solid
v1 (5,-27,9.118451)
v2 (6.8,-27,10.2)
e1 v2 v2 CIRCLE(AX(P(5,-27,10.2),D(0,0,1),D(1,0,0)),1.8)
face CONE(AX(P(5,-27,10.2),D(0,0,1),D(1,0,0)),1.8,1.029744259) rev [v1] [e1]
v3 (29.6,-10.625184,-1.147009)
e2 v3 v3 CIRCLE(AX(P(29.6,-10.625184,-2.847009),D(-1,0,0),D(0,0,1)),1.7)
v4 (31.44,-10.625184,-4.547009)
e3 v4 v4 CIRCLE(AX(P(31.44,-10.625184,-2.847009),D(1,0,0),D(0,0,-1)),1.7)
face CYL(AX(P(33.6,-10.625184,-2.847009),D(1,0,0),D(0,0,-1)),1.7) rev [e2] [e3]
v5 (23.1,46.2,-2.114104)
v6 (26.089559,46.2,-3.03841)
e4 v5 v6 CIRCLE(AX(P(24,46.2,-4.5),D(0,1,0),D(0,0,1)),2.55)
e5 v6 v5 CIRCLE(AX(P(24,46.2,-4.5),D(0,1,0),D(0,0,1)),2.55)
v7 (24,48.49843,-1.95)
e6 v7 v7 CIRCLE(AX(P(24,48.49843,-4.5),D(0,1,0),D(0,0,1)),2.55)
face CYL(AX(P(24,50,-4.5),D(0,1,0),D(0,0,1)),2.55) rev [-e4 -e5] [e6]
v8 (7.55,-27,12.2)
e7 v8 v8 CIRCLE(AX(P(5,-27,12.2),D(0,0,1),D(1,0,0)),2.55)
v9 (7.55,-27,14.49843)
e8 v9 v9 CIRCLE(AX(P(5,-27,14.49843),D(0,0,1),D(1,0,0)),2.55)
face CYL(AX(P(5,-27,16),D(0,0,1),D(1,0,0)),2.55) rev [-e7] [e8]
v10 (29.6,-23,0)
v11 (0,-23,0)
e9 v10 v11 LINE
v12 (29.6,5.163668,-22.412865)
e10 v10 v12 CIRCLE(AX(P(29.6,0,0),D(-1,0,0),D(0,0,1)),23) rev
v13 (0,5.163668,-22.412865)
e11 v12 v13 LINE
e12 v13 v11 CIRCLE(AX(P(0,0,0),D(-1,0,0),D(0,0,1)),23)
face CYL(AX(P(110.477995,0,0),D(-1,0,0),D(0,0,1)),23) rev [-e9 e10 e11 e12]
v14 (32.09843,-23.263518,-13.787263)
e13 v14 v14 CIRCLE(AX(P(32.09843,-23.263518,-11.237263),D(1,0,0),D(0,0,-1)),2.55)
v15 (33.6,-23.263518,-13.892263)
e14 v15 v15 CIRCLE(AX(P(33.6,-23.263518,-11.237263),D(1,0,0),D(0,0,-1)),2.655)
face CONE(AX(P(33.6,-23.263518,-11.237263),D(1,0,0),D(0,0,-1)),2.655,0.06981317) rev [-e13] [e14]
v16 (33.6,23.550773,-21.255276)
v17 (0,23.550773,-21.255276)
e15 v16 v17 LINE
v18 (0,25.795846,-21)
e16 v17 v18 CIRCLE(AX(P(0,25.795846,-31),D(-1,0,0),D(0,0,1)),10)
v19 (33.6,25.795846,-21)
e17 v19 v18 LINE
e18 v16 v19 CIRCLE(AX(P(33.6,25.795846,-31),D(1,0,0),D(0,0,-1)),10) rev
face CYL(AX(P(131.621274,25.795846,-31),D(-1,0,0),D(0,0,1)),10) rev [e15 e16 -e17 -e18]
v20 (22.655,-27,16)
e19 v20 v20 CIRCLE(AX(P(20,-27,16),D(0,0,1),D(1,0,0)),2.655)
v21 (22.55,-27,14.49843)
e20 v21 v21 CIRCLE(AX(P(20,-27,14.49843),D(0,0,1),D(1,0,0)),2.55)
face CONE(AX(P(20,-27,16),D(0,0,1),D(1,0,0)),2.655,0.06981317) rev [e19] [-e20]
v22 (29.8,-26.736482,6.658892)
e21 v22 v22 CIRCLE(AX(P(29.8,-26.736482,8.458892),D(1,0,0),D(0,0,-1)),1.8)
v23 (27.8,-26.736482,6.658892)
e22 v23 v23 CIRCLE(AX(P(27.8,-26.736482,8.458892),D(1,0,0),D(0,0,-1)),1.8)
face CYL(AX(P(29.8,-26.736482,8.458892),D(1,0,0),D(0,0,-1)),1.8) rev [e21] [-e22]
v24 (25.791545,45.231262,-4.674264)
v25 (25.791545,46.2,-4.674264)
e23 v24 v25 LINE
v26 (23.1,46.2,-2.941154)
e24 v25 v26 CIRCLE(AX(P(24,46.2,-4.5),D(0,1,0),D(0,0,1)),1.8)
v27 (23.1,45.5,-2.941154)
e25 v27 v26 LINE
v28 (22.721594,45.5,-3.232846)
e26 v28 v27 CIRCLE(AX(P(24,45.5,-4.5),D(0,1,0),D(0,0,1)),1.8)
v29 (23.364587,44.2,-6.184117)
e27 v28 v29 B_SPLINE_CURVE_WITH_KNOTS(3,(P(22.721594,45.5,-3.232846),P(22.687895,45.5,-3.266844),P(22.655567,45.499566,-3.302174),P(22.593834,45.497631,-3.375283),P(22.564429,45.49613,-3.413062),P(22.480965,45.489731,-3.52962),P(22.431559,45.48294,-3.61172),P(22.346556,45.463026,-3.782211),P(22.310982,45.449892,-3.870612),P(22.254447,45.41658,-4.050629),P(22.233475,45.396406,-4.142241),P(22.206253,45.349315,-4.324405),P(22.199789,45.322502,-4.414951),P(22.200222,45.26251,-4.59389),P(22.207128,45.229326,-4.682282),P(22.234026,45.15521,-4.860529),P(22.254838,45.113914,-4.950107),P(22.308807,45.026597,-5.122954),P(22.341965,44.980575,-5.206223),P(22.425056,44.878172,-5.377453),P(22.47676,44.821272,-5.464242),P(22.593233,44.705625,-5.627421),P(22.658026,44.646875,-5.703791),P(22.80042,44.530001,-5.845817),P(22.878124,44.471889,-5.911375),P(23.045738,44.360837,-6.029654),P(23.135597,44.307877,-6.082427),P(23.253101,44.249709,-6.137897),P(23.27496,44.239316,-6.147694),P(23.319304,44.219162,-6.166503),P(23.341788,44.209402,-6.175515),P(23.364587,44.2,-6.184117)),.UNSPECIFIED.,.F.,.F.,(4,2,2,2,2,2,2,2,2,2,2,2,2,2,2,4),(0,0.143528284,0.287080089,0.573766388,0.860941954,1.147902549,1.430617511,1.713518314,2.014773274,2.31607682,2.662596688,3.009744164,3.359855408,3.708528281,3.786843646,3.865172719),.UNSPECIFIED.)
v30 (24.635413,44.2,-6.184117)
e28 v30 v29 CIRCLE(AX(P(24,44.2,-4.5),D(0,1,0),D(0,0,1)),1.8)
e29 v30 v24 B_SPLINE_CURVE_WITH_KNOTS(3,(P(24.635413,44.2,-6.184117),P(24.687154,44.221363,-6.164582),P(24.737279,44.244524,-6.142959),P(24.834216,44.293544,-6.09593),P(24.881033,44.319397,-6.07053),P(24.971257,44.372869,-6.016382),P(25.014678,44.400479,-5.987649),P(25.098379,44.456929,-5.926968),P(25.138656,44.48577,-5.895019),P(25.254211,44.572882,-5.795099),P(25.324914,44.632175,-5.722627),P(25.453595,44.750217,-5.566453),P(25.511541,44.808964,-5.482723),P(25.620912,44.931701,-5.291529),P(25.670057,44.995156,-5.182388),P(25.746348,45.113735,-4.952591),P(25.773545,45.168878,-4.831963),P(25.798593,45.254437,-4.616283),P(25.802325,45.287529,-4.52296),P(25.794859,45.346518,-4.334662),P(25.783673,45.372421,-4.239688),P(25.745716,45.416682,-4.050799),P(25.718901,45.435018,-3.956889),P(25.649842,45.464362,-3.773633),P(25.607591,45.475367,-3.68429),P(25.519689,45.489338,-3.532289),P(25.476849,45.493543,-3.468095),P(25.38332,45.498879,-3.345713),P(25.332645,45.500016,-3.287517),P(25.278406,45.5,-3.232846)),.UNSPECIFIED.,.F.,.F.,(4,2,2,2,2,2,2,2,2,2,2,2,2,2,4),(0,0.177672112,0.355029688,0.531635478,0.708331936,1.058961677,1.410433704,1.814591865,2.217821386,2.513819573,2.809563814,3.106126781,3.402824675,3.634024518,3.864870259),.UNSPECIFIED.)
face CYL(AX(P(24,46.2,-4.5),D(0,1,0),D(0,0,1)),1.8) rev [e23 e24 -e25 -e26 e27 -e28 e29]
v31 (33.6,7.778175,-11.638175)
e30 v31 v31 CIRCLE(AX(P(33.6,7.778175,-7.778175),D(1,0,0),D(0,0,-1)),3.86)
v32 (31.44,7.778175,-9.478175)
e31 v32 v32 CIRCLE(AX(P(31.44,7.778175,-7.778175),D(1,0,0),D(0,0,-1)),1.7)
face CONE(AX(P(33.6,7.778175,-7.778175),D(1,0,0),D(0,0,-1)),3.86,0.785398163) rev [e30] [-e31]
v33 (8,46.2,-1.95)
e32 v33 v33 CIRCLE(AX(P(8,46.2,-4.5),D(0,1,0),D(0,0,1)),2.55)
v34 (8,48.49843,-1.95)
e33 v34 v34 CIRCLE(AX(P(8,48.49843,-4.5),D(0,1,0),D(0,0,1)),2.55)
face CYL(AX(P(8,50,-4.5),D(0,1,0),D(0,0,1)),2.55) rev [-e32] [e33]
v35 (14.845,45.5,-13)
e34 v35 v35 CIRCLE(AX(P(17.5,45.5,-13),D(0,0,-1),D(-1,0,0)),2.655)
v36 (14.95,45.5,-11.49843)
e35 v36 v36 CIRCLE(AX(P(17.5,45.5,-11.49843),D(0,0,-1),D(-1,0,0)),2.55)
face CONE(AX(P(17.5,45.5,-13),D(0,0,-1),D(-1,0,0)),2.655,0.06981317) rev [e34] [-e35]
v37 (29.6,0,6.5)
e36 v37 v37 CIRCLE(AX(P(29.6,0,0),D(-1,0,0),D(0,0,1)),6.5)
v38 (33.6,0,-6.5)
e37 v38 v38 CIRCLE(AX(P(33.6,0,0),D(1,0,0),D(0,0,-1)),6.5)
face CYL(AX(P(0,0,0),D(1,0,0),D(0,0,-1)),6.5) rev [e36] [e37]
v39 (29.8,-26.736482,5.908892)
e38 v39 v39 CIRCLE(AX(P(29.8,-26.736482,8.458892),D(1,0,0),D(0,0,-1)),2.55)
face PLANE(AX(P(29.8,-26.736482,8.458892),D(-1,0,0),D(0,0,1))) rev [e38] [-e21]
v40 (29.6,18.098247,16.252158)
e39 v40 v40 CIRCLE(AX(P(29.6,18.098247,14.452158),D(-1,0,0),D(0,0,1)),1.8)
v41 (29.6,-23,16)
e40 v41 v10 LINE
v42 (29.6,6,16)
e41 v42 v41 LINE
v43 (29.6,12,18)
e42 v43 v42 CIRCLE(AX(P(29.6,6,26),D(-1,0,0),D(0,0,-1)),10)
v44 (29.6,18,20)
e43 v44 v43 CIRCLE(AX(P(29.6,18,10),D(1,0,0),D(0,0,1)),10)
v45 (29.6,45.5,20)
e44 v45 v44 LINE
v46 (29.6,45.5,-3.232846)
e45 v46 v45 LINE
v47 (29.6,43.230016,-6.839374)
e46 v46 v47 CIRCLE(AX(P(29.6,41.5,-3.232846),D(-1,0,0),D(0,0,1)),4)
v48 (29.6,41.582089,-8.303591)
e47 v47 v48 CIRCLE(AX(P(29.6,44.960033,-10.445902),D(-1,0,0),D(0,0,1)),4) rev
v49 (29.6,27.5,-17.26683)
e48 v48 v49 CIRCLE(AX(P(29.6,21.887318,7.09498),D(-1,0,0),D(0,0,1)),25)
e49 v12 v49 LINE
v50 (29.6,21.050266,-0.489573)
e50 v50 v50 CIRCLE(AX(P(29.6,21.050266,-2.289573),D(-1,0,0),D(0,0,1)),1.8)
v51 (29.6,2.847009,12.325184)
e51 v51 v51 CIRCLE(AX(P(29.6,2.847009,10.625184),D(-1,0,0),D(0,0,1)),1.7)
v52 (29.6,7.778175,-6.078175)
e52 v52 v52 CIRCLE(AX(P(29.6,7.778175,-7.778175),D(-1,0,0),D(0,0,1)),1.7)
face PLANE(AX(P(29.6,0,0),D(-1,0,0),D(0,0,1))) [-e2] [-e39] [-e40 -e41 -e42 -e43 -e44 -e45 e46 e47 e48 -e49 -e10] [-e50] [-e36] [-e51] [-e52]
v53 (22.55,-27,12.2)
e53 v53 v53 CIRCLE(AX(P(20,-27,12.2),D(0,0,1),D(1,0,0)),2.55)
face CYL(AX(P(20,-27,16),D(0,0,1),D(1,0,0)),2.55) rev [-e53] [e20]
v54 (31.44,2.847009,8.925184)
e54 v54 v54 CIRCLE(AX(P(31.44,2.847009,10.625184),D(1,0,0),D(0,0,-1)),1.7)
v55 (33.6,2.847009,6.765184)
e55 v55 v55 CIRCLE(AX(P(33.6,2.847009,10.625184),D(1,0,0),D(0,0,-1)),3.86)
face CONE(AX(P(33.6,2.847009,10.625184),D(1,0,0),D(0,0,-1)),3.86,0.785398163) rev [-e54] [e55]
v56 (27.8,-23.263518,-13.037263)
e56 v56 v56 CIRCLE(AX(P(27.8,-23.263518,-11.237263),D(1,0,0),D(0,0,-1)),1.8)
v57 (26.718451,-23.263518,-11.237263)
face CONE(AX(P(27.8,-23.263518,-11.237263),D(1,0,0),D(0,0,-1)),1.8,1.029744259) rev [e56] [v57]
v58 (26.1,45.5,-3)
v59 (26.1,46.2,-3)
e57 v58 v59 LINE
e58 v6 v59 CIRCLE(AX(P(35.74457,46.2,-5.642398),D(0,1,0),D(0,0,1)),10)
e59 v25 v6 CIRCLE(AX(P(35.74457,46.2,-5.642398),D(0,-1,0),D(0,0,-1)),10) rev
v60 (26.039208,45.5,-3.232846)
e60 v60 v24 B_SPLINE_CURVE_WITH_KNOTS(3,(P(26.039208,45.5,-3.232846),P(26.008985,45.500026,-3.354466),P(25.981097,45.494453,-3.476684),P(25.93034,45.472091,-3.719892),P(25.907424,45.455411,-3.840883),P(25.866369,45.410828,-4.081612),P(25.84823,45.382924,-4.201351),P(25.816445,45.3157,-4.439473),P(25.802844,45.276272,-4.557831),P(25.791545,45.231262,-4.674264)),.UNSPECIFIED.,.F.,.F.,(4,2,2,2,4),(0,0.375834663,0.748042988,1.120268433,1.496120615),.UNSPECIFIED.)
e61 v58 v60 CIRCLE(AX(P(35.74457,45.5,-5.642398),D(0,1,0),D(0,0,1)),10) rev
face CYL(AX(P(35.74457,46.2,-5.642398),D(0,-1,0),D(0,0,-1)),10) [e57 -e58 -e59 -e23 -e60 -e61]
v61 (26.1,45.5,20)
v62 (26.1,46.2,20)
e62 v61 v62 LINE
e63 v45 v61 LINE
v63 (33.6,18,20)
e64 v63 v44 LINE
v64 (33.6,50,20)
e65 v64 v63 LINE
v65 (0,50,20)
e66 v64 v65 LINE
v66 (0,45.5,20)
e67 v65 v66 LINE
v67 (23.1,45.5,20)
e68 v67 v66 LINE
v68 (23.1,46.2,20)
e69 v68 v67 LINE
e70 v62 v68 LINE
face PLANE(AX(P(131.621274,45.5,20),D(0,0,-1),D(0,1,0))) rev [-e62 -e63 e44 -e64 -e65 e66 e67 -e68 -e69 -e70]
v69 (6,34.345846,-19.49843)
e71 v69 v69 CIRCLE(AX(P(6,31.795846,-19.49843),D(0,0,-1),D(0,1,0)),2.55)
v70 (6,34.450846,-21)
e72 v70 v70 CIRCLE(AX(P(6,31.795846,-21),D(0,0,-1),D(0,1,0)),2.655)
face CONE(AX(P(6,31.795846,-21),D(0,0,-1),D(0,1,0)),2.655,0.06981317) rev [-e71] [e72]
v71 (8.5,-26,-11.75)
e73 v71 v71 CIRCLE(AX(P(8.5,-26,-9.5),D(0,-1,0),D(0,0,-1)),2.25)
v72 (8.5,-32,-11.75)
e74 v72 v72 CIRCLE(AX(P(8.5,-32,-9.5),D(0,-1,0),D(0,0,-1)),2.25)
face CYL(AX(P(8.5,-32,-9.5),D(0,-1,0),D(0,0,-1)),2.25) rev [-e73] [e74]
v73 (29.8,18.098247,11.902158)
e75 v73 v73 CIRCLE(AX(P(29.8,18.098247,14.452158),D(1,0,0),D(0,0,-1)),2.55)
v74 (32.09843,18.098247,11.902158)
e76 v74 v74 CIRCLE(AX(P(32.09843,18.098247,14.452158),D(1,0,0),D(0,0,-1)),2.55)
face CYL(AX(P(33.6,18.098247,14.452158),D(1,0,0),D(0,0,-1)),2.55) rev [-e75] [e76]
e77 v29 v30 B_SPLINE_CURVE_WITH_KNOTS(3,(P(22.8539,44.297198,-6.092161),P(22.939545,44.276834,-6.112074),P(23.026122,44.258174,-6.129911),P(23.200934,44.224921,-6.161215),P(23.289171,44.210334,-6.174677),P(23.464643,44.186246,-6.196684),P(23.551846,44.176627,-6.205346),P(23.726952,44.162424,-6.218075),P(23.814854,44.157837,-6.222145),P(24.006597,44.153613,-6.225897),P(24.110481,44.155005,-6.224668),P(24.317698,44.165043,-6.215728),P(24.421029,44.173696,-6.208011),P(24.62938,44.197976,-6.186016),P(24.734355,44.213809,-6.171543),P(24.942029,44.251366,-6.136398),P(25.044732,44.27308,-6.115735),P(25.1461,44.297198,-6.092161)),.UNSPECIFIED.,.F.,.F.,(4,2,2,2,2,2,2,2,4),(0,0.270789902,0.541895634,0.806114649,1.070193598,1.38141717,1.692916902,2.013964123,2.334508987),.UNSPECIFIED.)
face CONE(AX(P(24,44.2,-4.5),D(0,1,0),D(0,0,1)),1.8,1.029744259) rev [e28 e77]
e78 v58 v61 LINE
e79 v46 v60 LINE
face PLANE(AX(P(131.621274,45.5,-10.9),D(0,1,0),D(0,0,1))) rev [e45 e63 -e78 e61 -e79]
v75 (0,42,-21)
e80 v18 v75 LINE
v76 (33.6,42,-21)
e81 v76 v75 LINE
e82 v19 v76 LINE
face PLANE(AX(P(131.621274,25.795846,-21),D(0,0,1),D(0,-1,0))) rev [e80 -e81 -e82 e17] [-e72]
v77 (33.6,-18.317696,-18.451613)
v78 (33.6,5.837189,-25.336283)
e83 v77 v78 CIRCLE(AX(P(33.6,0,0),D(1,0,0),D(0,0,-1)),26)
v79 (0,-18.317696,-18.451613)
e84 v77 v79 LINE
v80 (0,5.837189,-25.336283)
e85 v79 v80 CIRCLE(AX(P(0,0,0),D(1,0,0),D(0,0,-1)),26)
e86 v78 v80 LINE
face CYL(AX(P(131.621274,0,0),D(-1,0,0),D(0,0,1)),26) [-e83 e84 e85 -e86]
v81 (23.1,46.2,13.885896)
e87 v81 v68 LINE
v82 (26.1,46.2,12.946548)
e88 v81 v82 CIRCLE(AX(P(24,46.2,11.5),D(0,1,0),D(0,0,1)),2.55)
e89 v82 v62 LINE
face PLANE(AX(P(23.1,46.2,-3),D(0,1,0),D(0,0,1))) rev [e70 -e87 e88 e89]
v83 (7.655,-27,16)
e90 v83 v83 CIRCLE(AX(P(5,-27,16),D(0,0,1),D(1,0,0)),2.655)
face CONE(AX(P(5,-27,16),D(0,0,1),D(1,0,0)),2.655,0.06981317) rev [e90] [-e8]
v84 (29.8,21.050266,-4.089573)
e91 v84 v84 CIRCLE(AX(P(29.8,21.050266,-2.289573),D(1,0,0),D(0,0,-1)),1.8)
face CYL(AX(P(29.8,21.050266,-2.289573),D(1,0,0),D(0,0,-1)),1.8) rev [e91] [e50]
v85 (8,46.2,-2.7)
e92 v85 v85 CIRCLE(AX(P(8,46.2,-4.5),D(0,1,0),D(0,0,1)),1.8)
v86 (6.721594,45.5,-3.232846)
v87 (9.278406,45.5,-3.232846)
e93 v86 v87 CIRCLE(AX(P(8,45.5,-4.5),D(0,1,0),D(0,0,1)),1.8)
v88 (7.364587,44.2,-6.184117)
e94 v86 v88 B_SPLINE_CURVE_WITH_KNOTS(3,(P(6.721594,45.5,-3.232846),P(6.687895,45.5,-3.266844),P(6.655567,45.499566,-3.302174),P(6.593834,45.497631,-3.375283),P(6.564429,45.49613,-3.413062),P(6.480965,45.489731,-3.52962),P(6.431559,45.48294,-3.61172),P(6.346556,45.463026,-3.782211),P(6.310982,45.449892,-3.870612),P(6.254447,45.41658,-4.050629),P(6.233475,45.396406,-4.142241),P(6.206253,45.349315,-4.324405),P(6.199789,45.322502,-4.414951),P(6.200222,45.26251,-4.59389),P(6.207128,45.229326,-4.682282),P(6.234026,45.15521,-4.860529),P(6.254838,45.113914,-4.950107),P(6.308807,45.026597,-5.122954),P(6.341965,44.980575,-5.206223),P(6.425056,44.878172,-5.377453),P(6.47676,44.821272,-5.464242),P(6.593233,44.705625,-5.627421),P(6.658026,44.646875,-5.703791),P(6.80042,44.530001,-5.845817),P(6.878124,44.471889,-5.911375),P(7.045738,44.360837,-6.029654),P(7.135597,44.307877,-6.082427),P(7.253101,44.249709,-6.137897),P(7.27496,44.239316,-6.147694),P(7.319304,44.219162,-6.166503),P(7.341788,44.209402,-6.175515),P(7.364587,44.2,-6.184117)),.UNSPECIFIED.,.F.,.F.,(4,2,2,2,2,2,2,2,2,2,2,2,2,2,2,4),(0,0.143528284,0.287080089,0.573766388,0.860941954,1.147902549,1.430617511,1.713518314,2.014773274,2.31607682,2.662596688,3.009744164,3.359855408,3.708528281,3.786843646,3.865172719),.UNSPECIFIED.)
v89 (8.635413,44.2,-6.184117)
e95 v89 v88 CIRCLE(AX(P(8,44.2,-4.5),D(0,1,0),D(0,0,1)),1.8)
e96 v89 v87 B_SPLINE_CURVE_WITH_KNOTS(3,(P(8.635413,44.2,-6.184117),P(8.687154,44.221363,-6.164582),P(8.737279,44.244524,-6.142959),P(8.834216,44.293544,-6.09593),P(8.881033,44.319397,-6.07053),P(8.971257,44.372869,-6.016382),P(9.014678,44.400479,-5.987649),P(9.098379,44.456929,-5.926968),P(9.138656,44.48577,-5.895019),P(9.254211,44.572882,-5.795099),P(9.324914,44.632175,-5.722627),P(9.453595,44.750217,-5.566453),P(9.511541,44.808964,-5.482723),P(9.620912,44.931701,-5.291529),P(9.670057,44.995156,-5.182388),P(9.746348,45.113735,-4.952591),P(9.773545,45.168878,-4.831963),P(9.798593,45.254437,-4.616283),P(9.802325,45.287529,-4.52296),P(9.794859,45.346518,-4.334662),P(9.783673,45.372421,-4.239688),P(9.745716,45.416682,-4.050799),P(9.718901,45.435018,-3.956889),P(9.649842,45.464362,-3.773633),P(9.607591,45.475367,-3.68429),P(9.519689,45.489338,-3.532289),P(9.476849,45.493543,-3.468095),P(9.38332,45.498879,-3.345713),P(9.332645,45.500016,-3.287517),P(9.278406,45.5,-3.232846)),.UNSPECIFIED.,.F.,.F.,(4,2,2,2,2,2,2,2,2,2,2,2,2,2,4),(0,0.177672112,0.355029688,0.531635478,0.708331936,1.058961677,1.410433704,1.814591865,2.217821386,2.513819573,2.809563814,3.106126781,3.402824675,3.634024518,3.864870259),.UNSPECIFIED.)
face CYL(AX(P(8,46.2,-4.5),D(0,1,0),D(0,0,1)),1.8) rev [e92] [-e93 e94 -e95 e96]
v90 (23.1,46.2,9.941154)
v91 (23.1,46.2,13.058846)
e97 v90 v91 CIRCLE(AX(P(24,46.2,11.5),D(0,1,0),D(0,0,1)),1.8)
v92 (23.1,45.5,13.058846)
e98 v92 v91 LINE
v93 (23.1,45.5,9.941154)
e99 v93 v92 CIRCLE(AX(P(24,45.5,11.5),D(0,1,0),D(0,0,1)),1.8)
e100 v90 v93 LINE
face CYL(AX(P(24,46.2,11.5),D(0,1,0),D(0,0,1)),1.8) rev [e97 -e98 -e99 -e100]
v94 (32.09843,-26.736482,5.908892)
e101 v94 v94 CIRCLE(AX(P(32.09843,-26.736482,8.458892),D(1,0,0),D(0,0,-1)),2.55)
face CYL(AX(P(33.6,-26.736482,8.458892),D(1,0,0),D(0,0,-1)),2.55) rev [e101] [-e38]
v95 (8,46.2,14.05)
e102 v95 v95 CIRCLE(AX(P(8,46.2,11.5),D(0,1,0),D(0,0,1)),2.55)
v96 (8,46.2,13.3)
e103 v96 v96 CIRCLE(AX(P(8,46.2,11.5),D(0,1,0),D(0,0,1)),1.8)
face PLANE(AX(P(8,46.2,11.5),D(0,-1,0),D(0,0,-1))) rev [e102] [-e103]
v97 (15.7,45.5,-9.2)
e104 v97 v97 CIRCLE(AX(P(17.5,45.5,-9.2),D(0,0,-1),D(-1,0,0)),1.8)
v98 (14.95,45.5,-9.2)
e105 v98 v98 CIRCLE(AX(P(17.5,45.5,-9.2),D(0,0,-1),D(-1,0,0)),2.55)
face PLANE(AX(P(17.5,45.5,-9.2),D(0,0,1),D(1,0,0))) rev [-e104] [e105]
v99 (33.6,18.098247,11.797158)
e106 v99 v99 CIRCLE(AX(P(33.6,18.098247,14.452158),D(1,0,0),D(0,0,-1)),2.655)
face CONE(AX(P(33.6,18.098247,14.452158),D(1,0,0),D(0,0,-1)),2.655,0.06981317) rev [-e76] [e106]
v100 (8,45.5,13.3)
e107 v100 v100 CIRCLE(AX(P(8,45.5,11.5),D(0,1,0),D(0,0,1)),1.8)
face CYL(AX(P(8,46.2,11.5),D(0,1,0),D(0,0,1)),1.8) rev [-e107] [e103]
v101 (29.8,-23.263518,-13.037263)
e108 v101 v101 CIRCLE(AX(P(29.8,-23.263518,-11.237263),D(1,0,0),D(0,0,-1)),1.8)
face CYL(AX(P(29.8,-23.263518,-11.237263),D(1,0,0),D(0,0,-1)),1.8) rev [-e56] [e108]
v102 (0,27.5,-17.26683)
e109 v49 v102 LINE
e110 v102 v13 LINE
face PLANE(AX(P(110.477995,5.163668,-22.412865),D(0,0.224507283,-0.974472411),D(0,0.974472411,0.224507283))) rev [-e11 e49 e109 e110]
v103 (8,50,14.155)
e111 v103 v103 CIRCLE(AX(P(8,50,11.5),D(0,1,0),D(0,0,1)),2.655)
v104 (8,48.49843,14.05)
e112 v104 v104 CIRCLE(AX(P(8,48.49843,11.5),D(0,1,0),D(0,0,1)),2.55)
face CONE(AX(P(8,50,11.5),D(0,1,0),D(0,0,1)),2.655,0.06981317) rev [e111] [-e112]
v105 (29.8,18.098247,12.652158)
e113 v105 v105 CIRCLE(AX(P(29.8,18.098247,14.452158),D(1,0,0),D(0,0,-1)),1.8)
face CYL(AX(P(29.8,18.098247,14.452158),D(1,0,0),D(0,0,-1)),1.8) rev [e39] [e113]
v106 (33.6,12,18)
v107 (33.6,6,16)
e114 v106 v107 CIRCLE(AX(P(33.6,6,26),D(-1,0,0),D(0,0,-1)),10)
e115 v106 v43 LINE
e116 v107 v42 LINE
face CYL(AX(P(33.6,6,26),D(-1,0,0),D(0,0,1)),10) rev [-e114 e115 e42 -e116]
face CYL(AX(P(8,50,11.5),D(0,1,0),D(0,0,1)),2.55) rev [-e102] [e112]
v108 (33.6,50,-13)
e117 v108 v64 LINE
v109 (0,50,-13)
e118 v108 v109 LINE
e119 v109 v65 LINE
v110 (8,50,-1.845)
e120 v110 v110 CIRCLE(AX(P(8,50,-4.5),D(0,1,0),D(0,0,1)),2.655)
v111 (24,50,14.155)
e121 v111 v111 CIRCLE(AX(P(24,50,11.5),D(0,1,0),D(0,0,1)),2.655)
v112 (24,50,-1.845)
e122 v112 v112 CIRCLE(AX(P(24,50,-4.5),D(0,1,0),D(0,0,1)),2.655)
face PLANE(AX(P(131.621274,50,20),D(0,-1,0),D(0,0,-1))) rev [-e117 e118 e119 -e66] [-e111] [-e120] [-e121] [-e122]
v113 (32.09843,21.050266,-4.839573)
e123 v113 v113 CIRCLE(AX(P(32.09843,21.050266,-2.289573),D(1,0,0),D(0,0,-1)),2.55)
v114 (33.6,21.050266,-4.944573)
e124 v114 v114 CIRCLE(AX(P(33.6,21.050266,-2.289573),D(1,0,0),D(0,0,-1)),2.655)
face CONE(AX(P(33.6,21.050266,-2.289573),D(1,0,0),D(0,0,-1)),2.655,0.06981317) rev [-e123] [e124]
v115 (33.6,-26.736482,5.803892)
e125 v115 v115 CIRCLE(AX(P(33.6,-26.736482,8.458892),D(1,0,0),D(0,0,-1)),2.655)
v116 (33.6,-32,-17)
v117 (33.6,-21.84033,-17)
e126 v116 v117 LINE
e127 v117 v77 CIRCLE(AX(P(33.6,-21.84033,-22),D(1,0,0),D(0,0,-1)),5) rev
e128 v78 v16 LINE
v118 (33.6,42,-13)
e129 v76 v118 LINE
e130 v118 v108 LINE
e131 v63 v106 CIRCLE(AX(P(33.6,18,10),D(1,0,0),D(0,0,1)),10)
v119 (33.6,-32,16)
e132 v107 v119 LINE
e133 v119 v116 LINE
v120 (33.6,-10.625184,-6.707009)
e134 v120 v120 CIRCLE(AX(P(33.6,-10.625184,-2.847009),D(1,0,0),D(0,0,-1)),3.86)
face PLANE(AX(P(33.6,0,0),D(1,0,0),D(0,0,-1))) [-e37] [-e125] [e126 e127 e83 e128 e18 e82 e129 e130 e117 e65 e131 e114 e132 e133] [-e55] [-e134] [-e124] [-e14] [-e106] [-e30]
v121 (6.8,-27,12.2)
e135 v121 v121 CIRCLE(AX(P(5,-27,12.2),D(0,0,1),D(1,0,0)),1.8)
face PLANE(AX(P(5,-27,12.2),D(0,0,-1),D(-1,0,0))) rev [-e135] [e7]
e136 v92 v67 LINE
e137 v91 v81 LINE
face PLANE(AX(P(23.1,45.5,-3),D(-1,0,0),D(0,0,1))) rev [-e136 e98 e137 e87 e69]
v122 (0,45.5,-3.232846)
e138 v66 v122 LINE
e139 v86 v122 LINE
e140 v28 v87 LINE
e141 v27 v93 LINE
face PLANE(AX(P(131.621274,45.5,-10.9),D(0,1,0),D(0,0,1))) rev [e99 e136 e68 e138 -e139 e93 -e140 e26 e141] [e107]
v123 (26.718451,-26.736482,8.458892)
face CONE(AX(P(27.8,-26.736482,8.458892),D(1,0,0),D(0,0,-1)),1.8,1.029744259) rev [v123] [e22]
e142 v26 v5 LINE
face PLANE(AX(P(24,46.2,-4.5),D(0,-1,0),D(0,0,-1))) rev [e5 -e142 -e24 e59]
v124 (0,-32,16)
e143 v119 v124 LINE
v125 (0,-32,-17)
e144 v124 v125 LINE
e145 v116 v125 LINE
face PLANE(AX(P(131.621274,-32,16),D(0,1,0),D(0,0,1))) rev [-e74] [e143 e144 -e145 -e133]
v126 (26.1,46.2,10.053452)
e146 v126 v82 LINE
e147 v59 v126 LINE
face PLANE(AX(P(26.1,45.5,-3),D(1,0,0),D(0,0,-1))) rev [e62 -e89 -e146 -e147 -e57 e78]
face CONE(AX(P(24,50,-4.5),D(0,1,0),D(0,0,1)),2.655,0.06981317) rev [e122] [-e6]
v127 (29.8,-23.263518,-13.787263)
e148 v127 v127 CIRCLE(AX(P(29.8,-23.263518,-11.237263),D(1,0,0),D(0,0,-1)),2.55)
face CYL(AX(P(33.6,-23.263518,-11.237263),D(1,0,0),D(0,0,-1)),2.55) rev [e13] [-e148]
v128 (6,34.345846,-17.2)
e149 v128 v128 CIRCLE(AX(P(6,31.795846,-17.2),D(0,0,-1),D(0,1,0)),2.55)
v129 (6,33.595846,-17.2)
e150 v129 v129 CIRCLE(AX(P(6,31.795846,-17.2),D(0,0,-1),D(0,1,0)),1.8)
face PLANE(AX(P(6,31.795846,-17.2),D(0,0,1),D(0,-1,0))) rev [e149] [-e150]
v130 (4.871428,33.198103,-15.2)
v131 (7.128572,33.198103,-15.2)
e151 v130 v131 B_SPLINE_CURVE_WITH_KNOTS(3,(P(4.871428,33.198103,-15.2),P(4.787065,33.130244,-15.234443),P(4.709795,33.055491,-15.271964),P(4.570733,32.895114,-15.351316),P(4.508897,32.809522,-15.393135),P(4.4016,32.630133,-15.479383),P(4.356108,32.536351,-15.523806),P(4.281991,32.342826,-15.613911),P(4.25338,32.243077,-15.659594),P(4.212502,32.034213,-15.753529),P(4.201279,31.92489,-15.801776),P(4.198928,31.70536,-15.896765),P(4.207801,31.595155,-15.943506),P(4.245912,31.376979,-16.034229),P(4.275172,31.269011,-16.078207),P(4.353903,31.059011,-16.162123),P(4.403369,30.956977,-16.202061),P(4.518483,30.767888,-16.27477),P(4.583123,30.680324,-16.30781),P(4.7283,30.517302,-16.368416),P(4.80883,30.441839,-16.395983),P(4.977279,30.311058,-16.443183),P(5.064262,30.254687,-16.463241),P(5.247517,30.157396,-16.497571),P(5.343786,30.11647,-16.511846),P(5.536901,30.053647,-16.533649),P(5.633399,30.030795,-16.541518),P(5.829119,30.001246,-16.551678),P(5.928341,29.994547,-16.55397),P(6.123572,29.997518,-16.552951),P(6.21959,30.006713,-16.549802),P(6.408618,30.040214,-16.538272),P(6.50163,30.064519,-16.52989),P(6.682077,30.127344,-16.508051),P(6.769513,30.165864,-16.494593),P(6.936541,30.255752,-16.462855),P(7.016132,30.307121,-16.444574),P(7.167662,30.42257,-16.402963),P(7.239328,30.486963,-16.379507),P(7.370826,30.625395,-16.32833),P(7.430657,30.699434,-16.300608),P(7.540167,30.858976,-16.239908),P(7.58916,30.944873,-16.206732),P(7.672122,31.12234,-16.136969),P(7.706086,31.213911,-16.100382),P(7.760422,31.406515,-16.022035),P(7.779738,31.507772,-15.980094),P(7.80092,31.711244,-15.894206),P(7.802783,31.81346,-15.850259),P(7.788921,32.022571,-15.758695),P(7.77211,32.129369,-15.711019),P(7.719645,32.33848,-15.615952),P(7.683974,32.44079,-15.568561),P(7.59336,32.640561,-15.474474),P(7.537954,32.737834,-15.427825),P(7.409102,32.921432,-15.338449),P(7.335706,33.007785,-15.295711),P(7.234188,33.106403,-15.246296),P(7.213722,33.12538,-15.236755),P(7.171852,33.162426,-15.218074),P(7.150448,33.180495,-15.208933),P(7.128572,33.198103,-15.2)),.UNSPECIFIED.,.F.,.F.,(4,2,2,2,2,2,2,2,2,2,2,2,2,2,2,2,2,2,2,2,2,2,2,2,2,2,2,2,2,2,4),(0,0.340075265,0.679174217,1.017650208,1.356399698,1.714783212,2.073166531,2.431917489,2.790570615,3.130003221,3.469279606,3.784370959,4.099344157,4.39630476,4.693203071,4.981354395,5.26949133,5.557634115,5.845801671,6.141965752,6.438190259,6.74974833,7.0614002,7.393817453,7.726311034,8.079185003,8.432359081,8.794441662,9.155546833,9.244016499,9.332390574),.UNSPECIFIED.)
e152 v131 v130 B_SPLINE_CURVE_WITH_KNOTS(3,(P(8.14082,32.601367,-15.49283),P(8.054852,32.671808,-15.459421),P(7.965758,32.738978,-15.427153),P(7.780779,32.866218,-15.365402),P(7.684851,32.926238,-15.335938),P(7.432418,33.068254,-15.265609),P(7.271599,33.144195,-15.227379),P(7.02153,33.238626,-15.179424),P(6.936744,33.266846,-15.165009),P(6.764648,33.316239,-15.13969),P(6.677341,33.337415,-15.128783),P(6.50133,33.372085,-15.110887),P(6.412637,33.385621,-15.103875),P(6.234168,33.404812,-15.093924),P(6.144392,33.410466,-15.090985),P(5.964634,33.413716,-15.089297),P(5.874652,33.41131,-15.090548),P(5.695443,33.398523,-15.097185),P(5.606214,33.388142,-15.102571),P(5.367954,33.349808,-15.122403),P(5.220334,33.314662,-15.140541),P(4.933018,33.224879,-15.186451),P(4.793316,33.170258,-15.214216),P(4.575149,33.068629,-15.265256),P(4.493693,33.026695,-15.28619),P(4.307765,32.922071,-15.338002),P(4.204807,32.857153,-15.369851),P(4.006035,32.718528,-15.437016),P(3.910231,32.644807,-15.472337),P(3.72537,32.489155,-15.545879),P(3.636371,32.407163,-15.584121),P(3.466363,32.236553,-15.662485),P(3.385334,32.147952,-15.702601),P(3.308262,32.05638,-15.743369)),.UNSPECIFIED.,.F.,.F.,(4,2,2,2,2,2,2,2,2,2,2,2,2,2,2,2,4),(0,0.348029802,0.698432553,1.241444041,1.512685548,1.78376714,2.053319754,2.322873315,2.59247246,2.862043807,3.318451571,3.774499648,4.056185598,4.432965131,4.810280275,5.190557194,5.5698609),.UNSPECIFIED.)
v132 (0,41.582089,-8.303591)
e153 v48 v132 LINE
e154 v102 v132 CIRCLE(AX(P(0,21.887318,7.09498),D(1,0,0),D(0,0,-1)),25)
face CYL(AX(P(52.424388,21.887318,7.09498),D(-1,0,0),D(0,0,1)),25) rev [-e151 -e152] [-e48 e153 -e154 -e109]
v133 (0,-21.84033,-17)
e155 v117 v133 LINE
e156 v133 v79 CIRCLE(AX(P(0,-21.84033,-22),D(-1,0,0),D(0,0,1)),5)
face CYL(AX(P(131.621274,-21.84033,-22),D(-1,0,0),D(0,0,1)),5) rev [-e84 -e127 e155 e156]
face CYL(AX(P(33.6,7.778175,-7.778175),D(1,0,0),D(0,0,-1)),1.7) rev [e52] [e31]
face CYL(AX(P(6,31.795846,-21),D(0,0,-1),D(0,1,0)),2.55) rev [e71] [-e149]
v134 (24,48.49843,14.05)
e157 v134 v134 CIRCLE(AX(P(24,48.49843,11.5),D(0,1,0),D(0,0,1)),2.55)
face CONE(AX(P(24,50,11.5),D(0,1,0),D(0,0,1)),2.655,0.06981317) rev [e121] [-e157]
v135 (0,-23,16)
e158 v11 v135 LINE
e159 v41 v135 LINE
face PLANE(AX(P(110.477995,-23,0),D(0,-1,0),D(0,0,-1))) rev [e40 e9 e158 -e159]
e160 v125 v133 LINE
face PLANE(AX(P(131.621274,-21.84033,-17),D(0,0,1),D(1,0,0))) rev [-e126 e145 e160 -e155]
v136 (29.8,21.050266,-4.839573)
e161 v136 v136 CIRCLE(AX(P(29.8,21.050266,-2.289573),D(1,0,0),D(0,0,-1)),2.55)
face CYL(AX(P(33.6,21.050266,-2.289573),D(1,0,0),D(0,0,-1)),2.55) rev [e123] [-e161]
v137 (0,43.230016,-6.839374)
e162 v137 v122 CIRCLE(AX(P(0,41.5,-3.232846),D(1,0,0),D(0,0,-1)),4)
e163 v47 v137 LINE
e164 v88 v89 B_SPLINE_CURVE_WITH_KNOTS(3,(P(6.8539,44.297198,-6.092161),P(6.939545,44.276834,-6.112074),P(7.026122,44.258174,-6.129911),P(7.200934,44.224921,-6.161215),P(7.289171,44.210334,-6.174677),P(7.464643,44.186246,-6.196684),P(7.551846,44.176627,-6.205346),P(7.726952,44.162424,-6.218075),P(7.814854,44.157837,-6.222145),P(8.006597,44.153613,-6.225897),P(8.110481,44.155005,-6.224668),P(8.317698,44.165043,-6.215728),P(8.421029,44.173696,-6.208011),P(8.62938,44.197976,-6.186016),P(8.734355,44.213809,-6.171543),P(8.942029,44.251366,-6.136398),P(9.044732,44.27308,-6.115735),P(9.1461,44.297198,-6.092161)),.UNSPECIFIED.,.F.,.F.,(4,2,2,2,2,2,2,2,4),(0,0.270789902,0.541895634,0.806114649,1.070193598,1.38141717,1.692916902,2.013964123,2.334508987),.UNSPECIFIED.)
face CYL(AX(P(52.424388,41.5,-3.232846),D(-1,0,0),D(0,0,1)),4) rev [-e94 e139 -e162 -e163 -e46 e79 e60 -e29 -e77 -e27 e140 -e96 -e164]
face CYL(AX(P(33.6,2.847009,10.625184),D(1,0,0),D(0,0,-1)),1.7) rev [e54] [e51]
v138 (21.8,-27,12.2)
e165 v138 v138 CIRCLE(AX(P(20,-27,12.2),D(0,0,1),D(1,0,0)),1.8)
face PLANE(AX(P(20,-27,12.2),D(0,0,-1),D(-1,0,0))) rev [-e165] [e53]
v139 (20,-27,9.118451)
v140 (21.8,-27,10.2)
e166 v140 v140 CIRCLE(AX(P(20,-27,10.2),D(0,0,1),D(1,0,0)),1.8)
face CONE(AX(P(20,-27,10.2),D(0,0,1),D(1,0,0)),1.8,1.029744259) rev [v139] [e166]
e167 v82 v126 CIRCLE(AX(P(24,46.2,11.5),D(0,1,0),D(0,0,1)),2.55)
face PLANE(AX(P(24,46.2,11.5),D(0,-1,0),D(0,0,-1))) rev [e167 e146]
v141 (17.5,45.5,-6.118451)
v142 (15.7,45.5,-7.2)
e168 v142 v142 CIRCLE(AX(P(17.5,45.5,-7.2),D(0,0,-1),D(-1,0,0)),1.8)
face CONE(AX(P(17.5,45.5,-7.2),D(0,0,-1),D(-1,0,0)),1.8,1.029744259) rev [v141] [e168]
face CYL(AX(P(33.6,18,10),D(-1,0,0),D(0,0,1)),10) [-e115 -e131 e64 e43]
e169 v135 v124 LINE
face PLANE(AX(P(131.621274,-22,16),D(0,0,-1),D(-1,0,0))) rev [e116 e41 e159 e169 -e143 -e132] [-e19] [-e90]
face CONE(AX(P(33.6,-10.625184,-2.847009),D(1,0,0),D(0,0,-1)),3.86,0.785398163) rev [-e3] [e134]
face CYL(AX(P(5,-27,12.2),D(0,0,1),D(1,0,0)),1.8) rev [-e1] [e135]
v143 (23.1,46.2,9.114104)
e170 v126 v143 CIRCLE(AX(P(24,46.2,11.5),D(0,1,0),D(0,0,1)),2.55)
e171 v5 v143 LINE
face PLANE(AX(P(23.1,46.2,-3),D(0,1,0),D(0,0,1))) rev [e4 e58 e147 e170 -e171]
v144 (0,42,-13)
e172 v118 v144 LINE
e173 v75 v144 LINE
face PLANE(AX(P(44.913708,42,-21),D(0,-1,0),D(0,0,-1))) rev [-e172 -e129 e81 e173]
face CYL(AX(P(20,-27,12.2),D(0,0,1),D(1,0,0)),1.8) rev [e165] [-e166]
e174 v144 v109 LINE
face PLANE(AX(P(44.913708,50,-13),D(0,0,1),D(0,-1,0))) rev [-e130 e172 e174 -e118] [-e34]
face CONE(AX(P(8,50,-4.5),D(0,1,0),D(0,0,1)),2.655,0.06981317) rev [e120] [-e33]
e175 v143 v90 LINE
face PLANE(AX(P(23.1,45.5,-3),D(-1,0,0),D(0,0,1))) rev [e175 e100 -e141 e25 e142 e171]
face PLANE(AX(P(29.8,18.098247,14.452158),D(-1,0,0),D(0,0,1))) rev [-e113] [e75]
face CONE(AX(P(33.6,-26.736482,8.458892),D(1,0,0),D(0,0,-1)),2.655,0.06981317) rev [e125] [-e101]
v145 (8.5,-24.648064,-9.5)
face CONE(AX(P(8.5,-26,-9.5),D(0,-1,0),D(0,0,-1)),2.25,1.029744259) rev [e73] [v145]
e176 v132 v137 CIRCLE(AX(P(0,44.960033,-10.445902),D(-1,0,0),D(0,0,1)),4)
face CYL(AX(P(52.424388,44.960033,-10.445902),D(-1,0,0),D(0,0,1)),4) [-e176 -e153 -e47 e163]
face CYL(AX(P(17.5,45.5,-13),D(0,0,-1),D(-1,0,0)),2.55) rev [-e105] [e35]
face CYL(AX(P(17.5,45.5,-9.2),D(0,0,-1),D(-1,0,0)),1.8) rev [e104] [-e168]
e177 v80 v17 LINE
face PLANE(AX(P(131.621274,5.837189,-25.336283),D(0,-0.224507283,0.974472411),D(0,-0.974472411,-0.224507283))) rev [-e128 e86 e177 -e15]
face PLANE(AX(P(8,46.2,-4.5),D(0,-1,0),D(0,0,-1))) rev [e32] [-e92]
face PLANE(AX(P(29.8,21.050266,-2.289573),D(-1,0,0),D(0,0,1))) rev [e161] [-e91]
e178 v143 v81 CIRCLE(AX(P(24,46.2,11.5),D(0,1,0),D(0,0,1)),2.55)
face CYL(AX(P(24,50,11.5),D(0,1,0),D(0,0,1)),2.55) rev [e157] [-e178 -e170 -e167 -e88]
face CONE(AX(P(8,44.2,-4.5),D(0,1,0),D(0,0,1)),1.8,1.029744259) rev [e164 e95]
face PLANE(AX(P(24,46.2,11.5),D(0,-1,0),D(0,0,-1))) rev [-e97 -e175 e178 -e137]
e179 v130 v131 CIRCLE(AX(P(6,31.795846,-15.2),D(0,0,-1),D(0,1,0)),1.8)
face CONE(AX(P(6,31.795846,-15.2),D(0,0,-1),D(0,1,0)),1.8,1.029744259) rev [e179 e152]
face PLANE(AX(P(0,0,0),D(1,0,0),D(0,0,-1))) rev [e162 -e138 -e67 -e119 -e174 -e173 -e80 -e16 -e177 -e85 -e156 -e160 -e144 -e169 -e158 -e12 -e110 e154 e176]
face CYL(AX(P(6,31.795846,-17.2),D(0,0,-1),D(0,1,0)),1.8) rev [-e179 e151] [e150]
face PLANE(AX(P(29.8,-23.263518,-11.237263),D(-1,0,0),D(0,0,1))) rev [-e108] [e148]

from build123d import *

# Parameters (mm, degrees)
MOTOR_SHELL_DEPTH                   = 33.6
MOTOR_MOUNT_DEPTH                   = 4
MOUNTING_HOLE_D                     = 3.4
MOUNTING_HOLE_CSINK_D               = 7.72
MOUNTING_HOLE_CSINK_ANGLE           = 90
HOLE_DUPLICATION_COUNT              = 3
SKETCH11_R                          = 6.5
SHAFT_BASE_CUTOUT_DEPTH             = 66.612193989
CSK_FOR_M3_INSERT_SFHCS1_AT_2_COUNT = 2
CSK_FOR_M3_INSERT_SFHCS1_AT_2_PITCH = 20
CSK_FOR_M3_INSERT_SFHCS1_AT_3_COUNT = 2
CSK_FOR_M3_INSERT_SFHCS1_AT_3_PITCH = 45.233529346
CSK_FOR_M3_INSERT_SFHCS1_AT_4_COUNT = 2
CSK_FOR_M3_INSERT_SFHCS1_AT_4_PITCH = 48.980637063
CSK_FOR_M3_INSERT_SFHCS2_AT_2_COUNT = 2
CSK_FOR_M3_INSERT_SFHCS2_AT_2_PITCH = 16
CSK_FOR_M3_INSERT_SFHCS2_AT_3_COUNT = 2
CSK_FOR_M3_INSERT_SFHCS2_AT_3_PITCH = 22.627416998
CSK_FOR_M3_INSERT_SFHCS2_AT_4_COUNT = 2
CSK_FOR_M3_INSERT_SFHCS2_AT_4_PITCH = 16
CSK_FOR_M3_INSERT_SFHCS3_AT_2_COUNT = 2
CSK_FOR_M3_INSERT_SFHCS3_AT_2_PITCH = 15
ENLARGE_CAVITY_DEPTH                = 29.6
MOD_1_DEPTH                         = 29.6
SKETCH31_W                          = 8
SKETCH31_H                          = 8
MOD_2_DEPTH                         = 33.6
SKETCH36_W                          = 3
SKETCH36_H                          = 0.7
CUT_EXTRUDE1_DEPTH                  = 23
M4_CLEARANCE_HOLE1_D                = 4.5
M4_CLEARANCE_HOLE1_DEPTH            = 6
M4_CLEARANCE_HOLE1_TIP              = 1.351936393
INSERT_START                        = 45.5
INSERT_CLEARANCES_OUTLINE_R         = 1.8
INSERT_CLEARANCES_DEPTH             = 0.7
INSERT_START_2                      = 29.6
INSERT_CLEARANCES_2_OUTLINE_R       = 1.8
INSERT_CLEARANCES_2_DEPTH           = 0.2
INSERT_CLEARANCES_5_OUTLINE_W       = 1.724765775
INSERT_CLEARANCES_5_OUTLINE_H       = 2.045205283
INSERT_CLEARANCES_8_OUTLINE_W       = 1.724765775
INSERT_CLEARANCES_8_OUTLINE_H       = 2.045205283
FILLET1_R                           = 10


# Read off the part's stored shape, not the designer's step: Insert clearances
with BuildPart() as part:
    # Motor Shell Profile → Motor Shell (new body)
    with BuildSketch(Plane(origin=(0, 0, 0), x_dir=(0, 0, -1), z_dir=(1, 0, 0))):
        with BuildLine():
            Line((25.336282685, 5.837189366), (21.25527589, 23.550772962))
            ThreePointArc((21.25527589, 23.550772962), (21.064023926, 24.66607615), (21, 25.795845795))
            Line((21, 25.795845795), (21, 50))
            Line((21, 50), (-20, 50))
            Line((-20, 50), (-20, 45.5))
            Line((-20, 45.5), (10.9, 45.5))
            ThreePointArc((10.9, 45.5), (12.314213562, 44.914213562), (12.9, 43.5))
            Line((12.9, 43.5), (12.9, 42))
            Line((12.9, 42), (21.438393041, 4.939160233))
            ThreePointArc((21.438393041, 4.939160233), (17.214260442, -13.699242221), (0, -22))
            Line((0, -22), (-16, -22))
            Line((-16, -22), (-16, -32))
            Line((-16, -32), (17, -32))
            Line((17, -32), (17, -21.840329668))
            ThreePointArc((17, -21.840329668), (17.377125597, -19.935327763), (18.451612903, -18.31769585))
            ThreePointArc((18.451612903, -18.31769585), (25.004191048, -7.126740491), (25.336282685, 5.837189366))
        make_face()
    extrude(amount=MOTOR_SHELL_DEPTH)

    # Sketch3 → Motor Mount (add)
    with BuildSketch(Plane(origin=(29.6, 0, 0), x_dir=(0, 0, -1), z_dir=(1, 0, 0))):
        with BuildLine():
            Line((-20, 45.5), (12.9, 45.5))
            Line((12.9, 45.5), (12.9, 42))
            Line((12.9, 42), (21.438393041, 4.939160233))
            ThreePointArc((21.438393041, 4.939160233), (17.214260442, -13.699242221), (0, -22))
            Line((0, -22), (-16, -22))
            Line((-16, -22), (-16, 6))
            ThreePointArc((-16, 6), (-16.513167019, 9.16227766), (-18, 12))
            ThreePointArc((-18, 12), (-19.486832981, 14.83772234), (-20, 18))
            Line((-20, 18), (-20, 45.5))
        make_face()
    extrude(amount=MOTOR_MOUNT_DEPTH)

    # Mounting Hole (through all)
    with Locations(Plane(origin=(33.6, 0, 0), x_dir=(0, 0, -1), z_dir=(1, 0, 0))):
        with Locations((2.847009496, -10.625184089)):
            mounting_hole = CounterSinkHole(MOUNTING_HOLE_D / 2, MOUNTING_HOLE_CSINK_D / 2, counter_sink_angle=MOUNTING_HOLE_CSINK_ANGLE)

    # Hole Duplication: Mounting Hole ×3 about axis
    hole_duplication_axis = Axis((0, 0, 0), (1, 0, 0))
    for i in range(1, HOLE_DUPLICATION_COUNT):
        add(mounting_hole.rotate(hole_duplication_axis, i * 360 / HOLE_DUPLICATION_COUNT), mode=Mode.SUBTRACT)

    # Sketch11 → Shaft Base Cutout (cut, through all)
    with BuildSketch(Plane(origin=(33.6, 0, 0), x_dir=(0, 0, -1), z_dir=(1, 0, 0))):
        Circle(SKETCH11_R)
    extrude(amount=-SHAFT_BASE_CUTOUT_DEPTH, mode=Mode.SUBTRACT)

    # Sketch15 → CSK for M3 Insert SFHCS1 (revolve, cut)
    with BuildSketch(Plane(origin=(33.6, -26.736481777, 8.458892109), x_dir=(0, 0, -1), z_dir=(0, 1, 0))):
        Polygon((0, 0), (0, 3.8), (2.55, 3.8), (2.55, 1.501569957), (2.655, 0), align=None)
    csk_for_m3_insert_sfhcs1 = revolve(axis=Axis((39.95, -26.736481777, 8.458892109), (-1, 0, 0)), mode=Mode.SUBTRACT)

    # CSK for M3 Insert SFHCS1 at 2: CSK for M3 Insert SFHCS1 ×2
    with Locations(*[Vector(0, 0.17364817766693078, -0.984807753012208) * (i * CSK_FOR_M3_INSERT_SFHCS1_AT_2_PITCH) for i in range(1, CSK_FOR_M3_INSERT_SFHCS1_AT_2_COUNT)]):
        add(csk_for_m3_insert_sfhcs1, mode=Mode.SUBTRACT)

    # CSK for M3 Insert SFHCS1 at 3: CSK for M3 Insert SFHCS1 ×2
    with Locations(*[Vector(0, 0.9911835262254977, 0.13249610310944374) * (i * CSK_FOR_M3_INSERT_SFHCS1_AT_3_PITCH) for i in range(1, CSK_FOR_M3_INSERT_SFHCS1_AT_3_COUNT)]):
        add(csk_for_m3_insert_sfhcs1, mode=Mode.SUBTRACT)

    # CSK for M3 Insert SFHCS1 at 4: CSK for M3 Insert SFHCS1 ×2
    with Locations(*[Vector(0, 0.975625288008145, -0.219443153001009) * (i * CSK_FOR_M3_INSERT_SFHCS1_AT_4_PITCH) for i in range(1, CSK_FOR_M3_INSERT_SFHCS1_AT_4_COUNT)]):
        add(csk_for_m3_insert_sfhcs1, mode=Mode.SUBTRACT)

    # Sketch18 → CSK for M3 Insert SFHCS2 (revolve, cut)
    with BuildSketch(Plane(origin=(8, 50, -4.5), x_dir=(0, 0, 1), z_dir=(1, 0, 0))):
        Polygon((0, 0), (0, 3.8), (2.55, 3.8), (2.55, 1.501569957), (2.655, 0), align=None)
    csk_for_m3_insert_sfhcs2 = revolve(axis=Axis((8, 56.35, -4.5), (0, -1, 0)), mode=Mode.SUBTRACT)

    # CSK for M3 Insert SFHCS2 at 2: CSK for M3 Insert SFHCS2 ×2
    with Locations(*[(0, 0, i * CSK_FOR_M3_INSERT_SFHCS2_AT_2_PITCH) for i in range(1, CSK_FOR_M3_INSERT_SFHCS2_AT_2_COUNT)]):
        add(csk_for_m3_insert_sfhcs2, mode=Mode.SUBTRACT)

    # CSK for M3 Insert SFHCS2 at 3: CSK for M3 Insert SFHCS2 ×2
    with Locations(*[Vector(0.7071067811865475, 0, 0.7071067811865476) * (i * CSK_FOR_M3_INSERT_SFHCS2_AT_3_PITCH) for i in range(1, CSK_FOR_M3_INSERT_SFHCS2_AT_3_COUNT)]):
        add(csk_for_m3_insert_sfhcs2, mode=Mode.SUBTRACT)

    # CSK for M3 Insert SFHCS2 at 4: CSK for M3 Insert SFHCS2 ×2
    with Locations(*[(i * CSK_FOR_M3_INSERT_SFHCS2_AT_4_PITCH, 0, 0) for i in range(1, CSK_FOR_M3_INSERT_SFHCS2_AT_4_COUNT)]):
        add(csk_for_m3_insert_sfhcs2, mode=Mode.SUBTRACT)

    # Sketch24 → CSK for M3 Insert SFHCS3 (revolve, cut)
    with BuildSketch(Plane(origin=(5, -27, 16), x_dir=(0, -1, 0), z_dir=(1, 0, 0))):
        Polygon((0, 0), (0, 3.8), (2.55, 3.8), (2.55, 1.501569957), (2.655, 0), align=None)
    csk_for_m3_insert_sfhcs3 = revolve(axis=Axis((5, -27, 22.35), (0, 0, -1)), mode=Mode.SUBTRACT)

    # CSK for M3 Insert SFHCS3 at 2: CSK for M3 Insert SFHCS3 ×2
    with Locations(*[(i * CSK_FOR_M3_INSERT_SFHCS3_AT_2_PITCH, 0, 0) for i in range(1, CSK_FOR_M3_INSERT_SFHCS3_AT_2_COUNT)]):
        add(csk_for_m3_insert_sfhcs3, mode=Mode.SUBTRACT)

    # Sketch29 → Enlarge Cavity (cut)
    with BuildSketch(Plane.ZY):
        with BuildLine():
            Line((0, -23), (16, -23))
            Line((16, -23), (16, 6))
            ThreePointArc((16, 6), (16.513167019, 9.16227766), (18, 12))
            ThreePointArc((18, 12), (19.486832981, 14.83772234), (20, 18))
            Line((20, 18), (20, 45.5))
            Line((20, 45.5), (-11.926196318, 45.5))
            ThreePointArc((-11.926196318, 45.5), (-13.34040988, 44.914213562), (-13.926196318, 43.5))
            Line((-13.926196318, 43.5), (-13.926196318, 42))
            Line((-13.926196318, 42), (-22.412865452, 5.163667516))
            ThreePointArc((-22.412865452, 5.163667516), (-17.996726826, -14.32193505), (0, -23))
        make_face()
    extrude(amount=-ENLARGE_CAVITY_DEPTH, mode=Mode.SUBTRACT)

    # Sketch30 → Mod 1 (add)
    with BuildSketch(Plane.ZY):
        with BuildLine():
            Line((-3.232846165, 45.5), (-11.926196318, 45.5))
            ThreePointArc((-11.926196318, 45.5), (-13.34040988, 44.914213562), (-13.926196318, 43.5))
            Line((-13.926196318, 43.5), (-13.926196318, 42))
            Line((-13.926196318, 42), (-17.266830256, 27.5))
            ThreePointArc((-17.266830256, 27.5), (-13.995261355, 35.311241294), (-8.303590508, 41.582089451))
            ThreePointArc((-8.303590508, 41.582089451), (-7.45571726, 42.303193419), (-6.839374, 43.230016467))
            ThreePointArc((-6.839374, 43.230016467), (-5.363566012, 44.88526704), (-3.232846165, 45.5))
        make_face()
    extrude(amount=-MOD_1_DEPTH)

    # Sketch31 → Mod 2 (cut)
    with BuildSketch(Plane.ZY):
        with Locations((-17, 46)):
            Rectangle(SKETCH31_W, SKETCH31_H)
    extrude(amount=-MOD_2_DEPTH, mode=Mode.SUBTRACT)

    # Sketch33 → CSK for M3 Insert SFHCS4 (revolve, cut)
    with BuildSketch(Plane(origin=(17.5, 45.5, -13), x_dir=(0, 1, 0), z_dir=(1, 0, 0))):
        Polygon((0, 0), (0, 3.8), (2.55, 3.8), (2.55, 1.501569957), (2.655, 0), align=None)
    revolve(axis=Axis((17.5, 45.5, -19.35), (0, 0, 1)), mode=Mode.SUBTRACT)

    # Sketch36 → Cut-Extrude1 (cut)
    with BuildSketch(Plane.XY.offset(20)):
        with Locations((24.6, 45.85)):
            Rectangle(SKETCH36_W, SKETCH36_H)
    extrude(amount=-CUT_EXTRUDE1_DEPTH, mode=Mode.SUBTRACT)

    # M4 Clearance Hole1
    with Locations(Plane(origin=(0, -32, 0), x_dir=(-1, 0, 0), z_dir=(0, -1, 0))):
        with Locations((-8.5, 9.5)):
            Hole(M4_CLEARANCE_HOLE1_D / 2, depth=M4_CLEARANCE_HOLE1_DEPTH)
            with Locations((0, 0, -(M4_CLEARANCE_HOLE1_DEPTH + M4_CLEARANCE_HOLE1_TIP / 2))):  # 118° drill point
                Cone(0, M4_CLEARANCE_HOLE1_D / 2, M4_CLEARANCE_HOLE1_TIP, mode=Mode.SUBTRACT)

    # Sketch40 → CSK for M3 Insert SFHCS5 (revolve, cut)
    with BuildSketch(Plane(origin=(6, 31.795845795, -21), x_dir=(0, 1, 0), z_dir=(1, 0, 0))):
        Polygon((0, 0), (0, 3.8), (2.55, 3.8), (2.55, 1.501569957), (2.655, 0), align=None)
    revolve(axis=Axis((6, 31.795845795, -27.35), (0, 0, 1)), mode=Mode.SUBTRACT)

    # Insert clearances outline → Insert clearances (cut)
    with BuildSketch(Plane(origin=(0, 0, 0), x_dir=(1, 0, 0), z_dir=(0, 1, 0)).offset(INSERT_START)):
        with Locations((8, -11.5)):
            Circle(INSERT_CLEARANCES_OUTLINE_R)
        with BuildLine():
            Line((23.1, -13.058845727), (23.1, -9.941154273))
            ThreePointArc((23.1, -9.941154273), (22.2, -11.5), (23.1, -13.058845727))
        make_face()
        with BuildLine():
            ThreePointArc((24.994987437, 3), (23.944130883, 6.299132747), (23.1, 2.941154273))
            Line((23.1, 2.941154273), (23.1, 3))
            Line((23.1, 3), (24.994987437, 3))
        make_face()
        with Locations((8, 4.5)):
            Circle(INSERT_CLEARANCES_OUTLINE_R)
    extrude(amount=INSERT_CLEARANCES_DEPTH, mode=Mode.SUBTRACT)

    # Insert clearances 2 outline → Insert clearances 2 (cut)
    with BuildSketch(Plane.YZ.offset(INSERT_START_2)):
        with Locations((18.098247344, 14.452158477)):
            Circle(INSERT_CLEARANCES_2_OUTLINE_R)
        with Locations((21.050266364, -2.289573324)):
            Circle(INSERT_CLEARANCES_2_OUTLINE_R)
    extrude(amount=INSERT_CLEARANCES_2_DEPTH, mode=Mode.SUBTRACT)

    # Insert clearances 3 outline → Insert clearances 3 (revolve, cut)
    with BuildSketch(Plane(origin=(20, -27, 0), x_dir=(1, 0, 0), z_dir=(0, -1, 0))):
        Polygon((0, 12.2), (0, 9.118450886), (1.8, 10.2), (1.8, 12.2), align=None)
    revolve(axis=Axis((20, -27, 0), (0, 0, 1)), mode=Mode.SUBTRACT)

    # Insert clearances 4 outline → Insert clearances 4 (revolve, cut)
    with BuildSketch(Plane(origin=(5, -27, 0), x_dir=(1, 0, 0), z_dir=(0, -1, 0))):
        Polygon((0, 12.2), (0, 9.118450886), (1.8, 10.2), (1.8, 12.2), align=None)
    revolve(axis=Axis((5, -27, 0), (0, 0, 1)), mode=Mode.SUBTRACT)

    # Insert clearances 5 outline → Insert clearances 5 (revolve, cut)
    with BuildSketch(Plane(origin=(8, 0, -4.5), x_dir=(1, 0, 0), z_dir=(0, 0, 1))):
        Polygon((1.724765775, 46.2), (1.724765775, 44.154794717), (1.800001136, 44.200000683), (1.8, 46.2), align=None)
        with Locations((0.862382888, 45.177397359)):
            Rectangle(INSERT_CLEARANCES_5_OUTLINE_W, INSERT_CLEARANCES_5_OUTLINE_H)
    revolve(axis=Axis((8, 0, -4.5), (0, 1, 0)), mode=Mode.SUBTRACT)

    # Insert clearances 6 outline → Insert clearances 6 (revolve, cut)
    with BuildSketch(Plane(origin=(17.5, 45.5, 0), x_dir=(1, 0, 0), z_dir=(0, -1, 0))):
        Polygon((1.8, -7.2), (0, -6.118450886), (0, -9.2), (1.8, -9.2), align=None)
    revolve(axis=Axis((17.5, 45.5, 0), (0, 0, 1)), mode=Mode.SUBTRACT)

    # Insert clearances 7 outline → Insert clearances 7 (revolve, cut)
    with BuildSketch(Plane(origin=(6, 31.795845795, 0), x_dir=(1, 0, 0), z_dir=(0, -1, 0))):
        Polygon((0, -17.2), (1.8, -17.2), (1.8, -15.2), (1.616604169, -15.089804668), (0, -15.089804668), align=None)
    revolve(axis=Axis((6, 31.795845795, 0), (0, 0, 1)), mode=Mode.SUBTRACT)

    # Insert clearances 8 outline → Insert clearances 8 (revolve, cut)
    with BuildSketch(Plane(origin=(24, 0, -4.5), x_dir=(1, 0, 0), z_dir=(0, 0, 1))):
        Polygon((1.724765775, 44.154794717), (1.800001136, 44.200000683), (1.8, 46.2), (1.724765775, 46.2), align=None)
        with Locations((0.862382888, 45.177397359)):
            Rectangle(INSERT_CLEARANCES_8_OUTLINE_W, INSERT_CLEARANCES_8_OUTLINE_H)
    revolve(axis=Axis((24, 0, -4.5), (0, 1, 0)), mode=Mode.SUBTRACT)

    # Insert clearances 9 outline → Insert clearances 9 (revolve, cut)
    with BuildSketch(Plane(origin=(0, -23.263518223, -11.237262951), x_dir=(0, 1, 0), z_dir=(0, 0, -1))):
        Polygon((0, 29.8), (0, 26.718450886), (1.8, 27.8), (1.8, 29.8), align=None)
    revolve(axis=Axis((0, -23.263518223, -11.237262951), (1, 0, 0)), mode=Mode.SUBTRACT)

    # Insert clearances 10 outline → Insert clearances 10 (revolve, cut)
    with BuildSketch(Plane(origin=(0, -26.736481777, 8.458892109), x_dir=(0, 1, 0), z_dir=(0, 0, -1))):
        Polygon((0, 29.8), (0, 26.718450886), (1.8, 27.8), (1.8, 29.8), align=None)
    revolve(axis=Axis((0, -26.736481777, 8.458892109), (1, 0, 0)), mode=Mode.SUBTRACT)

    # Fillet1
    # the kernel refuses this fillet: 10 mm, written as the material it takes off along each edge
    with BuildSketch(Plane(origin=(24.994989492, 40.864768522, -3), x_dir=(0.42962057517036795, 0, -0.9030095023809451), z_dir=(0, 1, 0))) as fillet1_piece_1:
        with BuildLine():
            CenterArc((7.004346539, -8.571749196), FILLET1_R, 120.999152423, 9.766079725)
            Line((0.47473525, -0.997834989), (0, 0))
            ThreePointArc((0, 0), (0.927046296, -0.257085307), (1.854092591, 0))
        make_face()
    extrude(amount=5.335231478, mode=Mode.SUBTRACT)


solid = part.part
